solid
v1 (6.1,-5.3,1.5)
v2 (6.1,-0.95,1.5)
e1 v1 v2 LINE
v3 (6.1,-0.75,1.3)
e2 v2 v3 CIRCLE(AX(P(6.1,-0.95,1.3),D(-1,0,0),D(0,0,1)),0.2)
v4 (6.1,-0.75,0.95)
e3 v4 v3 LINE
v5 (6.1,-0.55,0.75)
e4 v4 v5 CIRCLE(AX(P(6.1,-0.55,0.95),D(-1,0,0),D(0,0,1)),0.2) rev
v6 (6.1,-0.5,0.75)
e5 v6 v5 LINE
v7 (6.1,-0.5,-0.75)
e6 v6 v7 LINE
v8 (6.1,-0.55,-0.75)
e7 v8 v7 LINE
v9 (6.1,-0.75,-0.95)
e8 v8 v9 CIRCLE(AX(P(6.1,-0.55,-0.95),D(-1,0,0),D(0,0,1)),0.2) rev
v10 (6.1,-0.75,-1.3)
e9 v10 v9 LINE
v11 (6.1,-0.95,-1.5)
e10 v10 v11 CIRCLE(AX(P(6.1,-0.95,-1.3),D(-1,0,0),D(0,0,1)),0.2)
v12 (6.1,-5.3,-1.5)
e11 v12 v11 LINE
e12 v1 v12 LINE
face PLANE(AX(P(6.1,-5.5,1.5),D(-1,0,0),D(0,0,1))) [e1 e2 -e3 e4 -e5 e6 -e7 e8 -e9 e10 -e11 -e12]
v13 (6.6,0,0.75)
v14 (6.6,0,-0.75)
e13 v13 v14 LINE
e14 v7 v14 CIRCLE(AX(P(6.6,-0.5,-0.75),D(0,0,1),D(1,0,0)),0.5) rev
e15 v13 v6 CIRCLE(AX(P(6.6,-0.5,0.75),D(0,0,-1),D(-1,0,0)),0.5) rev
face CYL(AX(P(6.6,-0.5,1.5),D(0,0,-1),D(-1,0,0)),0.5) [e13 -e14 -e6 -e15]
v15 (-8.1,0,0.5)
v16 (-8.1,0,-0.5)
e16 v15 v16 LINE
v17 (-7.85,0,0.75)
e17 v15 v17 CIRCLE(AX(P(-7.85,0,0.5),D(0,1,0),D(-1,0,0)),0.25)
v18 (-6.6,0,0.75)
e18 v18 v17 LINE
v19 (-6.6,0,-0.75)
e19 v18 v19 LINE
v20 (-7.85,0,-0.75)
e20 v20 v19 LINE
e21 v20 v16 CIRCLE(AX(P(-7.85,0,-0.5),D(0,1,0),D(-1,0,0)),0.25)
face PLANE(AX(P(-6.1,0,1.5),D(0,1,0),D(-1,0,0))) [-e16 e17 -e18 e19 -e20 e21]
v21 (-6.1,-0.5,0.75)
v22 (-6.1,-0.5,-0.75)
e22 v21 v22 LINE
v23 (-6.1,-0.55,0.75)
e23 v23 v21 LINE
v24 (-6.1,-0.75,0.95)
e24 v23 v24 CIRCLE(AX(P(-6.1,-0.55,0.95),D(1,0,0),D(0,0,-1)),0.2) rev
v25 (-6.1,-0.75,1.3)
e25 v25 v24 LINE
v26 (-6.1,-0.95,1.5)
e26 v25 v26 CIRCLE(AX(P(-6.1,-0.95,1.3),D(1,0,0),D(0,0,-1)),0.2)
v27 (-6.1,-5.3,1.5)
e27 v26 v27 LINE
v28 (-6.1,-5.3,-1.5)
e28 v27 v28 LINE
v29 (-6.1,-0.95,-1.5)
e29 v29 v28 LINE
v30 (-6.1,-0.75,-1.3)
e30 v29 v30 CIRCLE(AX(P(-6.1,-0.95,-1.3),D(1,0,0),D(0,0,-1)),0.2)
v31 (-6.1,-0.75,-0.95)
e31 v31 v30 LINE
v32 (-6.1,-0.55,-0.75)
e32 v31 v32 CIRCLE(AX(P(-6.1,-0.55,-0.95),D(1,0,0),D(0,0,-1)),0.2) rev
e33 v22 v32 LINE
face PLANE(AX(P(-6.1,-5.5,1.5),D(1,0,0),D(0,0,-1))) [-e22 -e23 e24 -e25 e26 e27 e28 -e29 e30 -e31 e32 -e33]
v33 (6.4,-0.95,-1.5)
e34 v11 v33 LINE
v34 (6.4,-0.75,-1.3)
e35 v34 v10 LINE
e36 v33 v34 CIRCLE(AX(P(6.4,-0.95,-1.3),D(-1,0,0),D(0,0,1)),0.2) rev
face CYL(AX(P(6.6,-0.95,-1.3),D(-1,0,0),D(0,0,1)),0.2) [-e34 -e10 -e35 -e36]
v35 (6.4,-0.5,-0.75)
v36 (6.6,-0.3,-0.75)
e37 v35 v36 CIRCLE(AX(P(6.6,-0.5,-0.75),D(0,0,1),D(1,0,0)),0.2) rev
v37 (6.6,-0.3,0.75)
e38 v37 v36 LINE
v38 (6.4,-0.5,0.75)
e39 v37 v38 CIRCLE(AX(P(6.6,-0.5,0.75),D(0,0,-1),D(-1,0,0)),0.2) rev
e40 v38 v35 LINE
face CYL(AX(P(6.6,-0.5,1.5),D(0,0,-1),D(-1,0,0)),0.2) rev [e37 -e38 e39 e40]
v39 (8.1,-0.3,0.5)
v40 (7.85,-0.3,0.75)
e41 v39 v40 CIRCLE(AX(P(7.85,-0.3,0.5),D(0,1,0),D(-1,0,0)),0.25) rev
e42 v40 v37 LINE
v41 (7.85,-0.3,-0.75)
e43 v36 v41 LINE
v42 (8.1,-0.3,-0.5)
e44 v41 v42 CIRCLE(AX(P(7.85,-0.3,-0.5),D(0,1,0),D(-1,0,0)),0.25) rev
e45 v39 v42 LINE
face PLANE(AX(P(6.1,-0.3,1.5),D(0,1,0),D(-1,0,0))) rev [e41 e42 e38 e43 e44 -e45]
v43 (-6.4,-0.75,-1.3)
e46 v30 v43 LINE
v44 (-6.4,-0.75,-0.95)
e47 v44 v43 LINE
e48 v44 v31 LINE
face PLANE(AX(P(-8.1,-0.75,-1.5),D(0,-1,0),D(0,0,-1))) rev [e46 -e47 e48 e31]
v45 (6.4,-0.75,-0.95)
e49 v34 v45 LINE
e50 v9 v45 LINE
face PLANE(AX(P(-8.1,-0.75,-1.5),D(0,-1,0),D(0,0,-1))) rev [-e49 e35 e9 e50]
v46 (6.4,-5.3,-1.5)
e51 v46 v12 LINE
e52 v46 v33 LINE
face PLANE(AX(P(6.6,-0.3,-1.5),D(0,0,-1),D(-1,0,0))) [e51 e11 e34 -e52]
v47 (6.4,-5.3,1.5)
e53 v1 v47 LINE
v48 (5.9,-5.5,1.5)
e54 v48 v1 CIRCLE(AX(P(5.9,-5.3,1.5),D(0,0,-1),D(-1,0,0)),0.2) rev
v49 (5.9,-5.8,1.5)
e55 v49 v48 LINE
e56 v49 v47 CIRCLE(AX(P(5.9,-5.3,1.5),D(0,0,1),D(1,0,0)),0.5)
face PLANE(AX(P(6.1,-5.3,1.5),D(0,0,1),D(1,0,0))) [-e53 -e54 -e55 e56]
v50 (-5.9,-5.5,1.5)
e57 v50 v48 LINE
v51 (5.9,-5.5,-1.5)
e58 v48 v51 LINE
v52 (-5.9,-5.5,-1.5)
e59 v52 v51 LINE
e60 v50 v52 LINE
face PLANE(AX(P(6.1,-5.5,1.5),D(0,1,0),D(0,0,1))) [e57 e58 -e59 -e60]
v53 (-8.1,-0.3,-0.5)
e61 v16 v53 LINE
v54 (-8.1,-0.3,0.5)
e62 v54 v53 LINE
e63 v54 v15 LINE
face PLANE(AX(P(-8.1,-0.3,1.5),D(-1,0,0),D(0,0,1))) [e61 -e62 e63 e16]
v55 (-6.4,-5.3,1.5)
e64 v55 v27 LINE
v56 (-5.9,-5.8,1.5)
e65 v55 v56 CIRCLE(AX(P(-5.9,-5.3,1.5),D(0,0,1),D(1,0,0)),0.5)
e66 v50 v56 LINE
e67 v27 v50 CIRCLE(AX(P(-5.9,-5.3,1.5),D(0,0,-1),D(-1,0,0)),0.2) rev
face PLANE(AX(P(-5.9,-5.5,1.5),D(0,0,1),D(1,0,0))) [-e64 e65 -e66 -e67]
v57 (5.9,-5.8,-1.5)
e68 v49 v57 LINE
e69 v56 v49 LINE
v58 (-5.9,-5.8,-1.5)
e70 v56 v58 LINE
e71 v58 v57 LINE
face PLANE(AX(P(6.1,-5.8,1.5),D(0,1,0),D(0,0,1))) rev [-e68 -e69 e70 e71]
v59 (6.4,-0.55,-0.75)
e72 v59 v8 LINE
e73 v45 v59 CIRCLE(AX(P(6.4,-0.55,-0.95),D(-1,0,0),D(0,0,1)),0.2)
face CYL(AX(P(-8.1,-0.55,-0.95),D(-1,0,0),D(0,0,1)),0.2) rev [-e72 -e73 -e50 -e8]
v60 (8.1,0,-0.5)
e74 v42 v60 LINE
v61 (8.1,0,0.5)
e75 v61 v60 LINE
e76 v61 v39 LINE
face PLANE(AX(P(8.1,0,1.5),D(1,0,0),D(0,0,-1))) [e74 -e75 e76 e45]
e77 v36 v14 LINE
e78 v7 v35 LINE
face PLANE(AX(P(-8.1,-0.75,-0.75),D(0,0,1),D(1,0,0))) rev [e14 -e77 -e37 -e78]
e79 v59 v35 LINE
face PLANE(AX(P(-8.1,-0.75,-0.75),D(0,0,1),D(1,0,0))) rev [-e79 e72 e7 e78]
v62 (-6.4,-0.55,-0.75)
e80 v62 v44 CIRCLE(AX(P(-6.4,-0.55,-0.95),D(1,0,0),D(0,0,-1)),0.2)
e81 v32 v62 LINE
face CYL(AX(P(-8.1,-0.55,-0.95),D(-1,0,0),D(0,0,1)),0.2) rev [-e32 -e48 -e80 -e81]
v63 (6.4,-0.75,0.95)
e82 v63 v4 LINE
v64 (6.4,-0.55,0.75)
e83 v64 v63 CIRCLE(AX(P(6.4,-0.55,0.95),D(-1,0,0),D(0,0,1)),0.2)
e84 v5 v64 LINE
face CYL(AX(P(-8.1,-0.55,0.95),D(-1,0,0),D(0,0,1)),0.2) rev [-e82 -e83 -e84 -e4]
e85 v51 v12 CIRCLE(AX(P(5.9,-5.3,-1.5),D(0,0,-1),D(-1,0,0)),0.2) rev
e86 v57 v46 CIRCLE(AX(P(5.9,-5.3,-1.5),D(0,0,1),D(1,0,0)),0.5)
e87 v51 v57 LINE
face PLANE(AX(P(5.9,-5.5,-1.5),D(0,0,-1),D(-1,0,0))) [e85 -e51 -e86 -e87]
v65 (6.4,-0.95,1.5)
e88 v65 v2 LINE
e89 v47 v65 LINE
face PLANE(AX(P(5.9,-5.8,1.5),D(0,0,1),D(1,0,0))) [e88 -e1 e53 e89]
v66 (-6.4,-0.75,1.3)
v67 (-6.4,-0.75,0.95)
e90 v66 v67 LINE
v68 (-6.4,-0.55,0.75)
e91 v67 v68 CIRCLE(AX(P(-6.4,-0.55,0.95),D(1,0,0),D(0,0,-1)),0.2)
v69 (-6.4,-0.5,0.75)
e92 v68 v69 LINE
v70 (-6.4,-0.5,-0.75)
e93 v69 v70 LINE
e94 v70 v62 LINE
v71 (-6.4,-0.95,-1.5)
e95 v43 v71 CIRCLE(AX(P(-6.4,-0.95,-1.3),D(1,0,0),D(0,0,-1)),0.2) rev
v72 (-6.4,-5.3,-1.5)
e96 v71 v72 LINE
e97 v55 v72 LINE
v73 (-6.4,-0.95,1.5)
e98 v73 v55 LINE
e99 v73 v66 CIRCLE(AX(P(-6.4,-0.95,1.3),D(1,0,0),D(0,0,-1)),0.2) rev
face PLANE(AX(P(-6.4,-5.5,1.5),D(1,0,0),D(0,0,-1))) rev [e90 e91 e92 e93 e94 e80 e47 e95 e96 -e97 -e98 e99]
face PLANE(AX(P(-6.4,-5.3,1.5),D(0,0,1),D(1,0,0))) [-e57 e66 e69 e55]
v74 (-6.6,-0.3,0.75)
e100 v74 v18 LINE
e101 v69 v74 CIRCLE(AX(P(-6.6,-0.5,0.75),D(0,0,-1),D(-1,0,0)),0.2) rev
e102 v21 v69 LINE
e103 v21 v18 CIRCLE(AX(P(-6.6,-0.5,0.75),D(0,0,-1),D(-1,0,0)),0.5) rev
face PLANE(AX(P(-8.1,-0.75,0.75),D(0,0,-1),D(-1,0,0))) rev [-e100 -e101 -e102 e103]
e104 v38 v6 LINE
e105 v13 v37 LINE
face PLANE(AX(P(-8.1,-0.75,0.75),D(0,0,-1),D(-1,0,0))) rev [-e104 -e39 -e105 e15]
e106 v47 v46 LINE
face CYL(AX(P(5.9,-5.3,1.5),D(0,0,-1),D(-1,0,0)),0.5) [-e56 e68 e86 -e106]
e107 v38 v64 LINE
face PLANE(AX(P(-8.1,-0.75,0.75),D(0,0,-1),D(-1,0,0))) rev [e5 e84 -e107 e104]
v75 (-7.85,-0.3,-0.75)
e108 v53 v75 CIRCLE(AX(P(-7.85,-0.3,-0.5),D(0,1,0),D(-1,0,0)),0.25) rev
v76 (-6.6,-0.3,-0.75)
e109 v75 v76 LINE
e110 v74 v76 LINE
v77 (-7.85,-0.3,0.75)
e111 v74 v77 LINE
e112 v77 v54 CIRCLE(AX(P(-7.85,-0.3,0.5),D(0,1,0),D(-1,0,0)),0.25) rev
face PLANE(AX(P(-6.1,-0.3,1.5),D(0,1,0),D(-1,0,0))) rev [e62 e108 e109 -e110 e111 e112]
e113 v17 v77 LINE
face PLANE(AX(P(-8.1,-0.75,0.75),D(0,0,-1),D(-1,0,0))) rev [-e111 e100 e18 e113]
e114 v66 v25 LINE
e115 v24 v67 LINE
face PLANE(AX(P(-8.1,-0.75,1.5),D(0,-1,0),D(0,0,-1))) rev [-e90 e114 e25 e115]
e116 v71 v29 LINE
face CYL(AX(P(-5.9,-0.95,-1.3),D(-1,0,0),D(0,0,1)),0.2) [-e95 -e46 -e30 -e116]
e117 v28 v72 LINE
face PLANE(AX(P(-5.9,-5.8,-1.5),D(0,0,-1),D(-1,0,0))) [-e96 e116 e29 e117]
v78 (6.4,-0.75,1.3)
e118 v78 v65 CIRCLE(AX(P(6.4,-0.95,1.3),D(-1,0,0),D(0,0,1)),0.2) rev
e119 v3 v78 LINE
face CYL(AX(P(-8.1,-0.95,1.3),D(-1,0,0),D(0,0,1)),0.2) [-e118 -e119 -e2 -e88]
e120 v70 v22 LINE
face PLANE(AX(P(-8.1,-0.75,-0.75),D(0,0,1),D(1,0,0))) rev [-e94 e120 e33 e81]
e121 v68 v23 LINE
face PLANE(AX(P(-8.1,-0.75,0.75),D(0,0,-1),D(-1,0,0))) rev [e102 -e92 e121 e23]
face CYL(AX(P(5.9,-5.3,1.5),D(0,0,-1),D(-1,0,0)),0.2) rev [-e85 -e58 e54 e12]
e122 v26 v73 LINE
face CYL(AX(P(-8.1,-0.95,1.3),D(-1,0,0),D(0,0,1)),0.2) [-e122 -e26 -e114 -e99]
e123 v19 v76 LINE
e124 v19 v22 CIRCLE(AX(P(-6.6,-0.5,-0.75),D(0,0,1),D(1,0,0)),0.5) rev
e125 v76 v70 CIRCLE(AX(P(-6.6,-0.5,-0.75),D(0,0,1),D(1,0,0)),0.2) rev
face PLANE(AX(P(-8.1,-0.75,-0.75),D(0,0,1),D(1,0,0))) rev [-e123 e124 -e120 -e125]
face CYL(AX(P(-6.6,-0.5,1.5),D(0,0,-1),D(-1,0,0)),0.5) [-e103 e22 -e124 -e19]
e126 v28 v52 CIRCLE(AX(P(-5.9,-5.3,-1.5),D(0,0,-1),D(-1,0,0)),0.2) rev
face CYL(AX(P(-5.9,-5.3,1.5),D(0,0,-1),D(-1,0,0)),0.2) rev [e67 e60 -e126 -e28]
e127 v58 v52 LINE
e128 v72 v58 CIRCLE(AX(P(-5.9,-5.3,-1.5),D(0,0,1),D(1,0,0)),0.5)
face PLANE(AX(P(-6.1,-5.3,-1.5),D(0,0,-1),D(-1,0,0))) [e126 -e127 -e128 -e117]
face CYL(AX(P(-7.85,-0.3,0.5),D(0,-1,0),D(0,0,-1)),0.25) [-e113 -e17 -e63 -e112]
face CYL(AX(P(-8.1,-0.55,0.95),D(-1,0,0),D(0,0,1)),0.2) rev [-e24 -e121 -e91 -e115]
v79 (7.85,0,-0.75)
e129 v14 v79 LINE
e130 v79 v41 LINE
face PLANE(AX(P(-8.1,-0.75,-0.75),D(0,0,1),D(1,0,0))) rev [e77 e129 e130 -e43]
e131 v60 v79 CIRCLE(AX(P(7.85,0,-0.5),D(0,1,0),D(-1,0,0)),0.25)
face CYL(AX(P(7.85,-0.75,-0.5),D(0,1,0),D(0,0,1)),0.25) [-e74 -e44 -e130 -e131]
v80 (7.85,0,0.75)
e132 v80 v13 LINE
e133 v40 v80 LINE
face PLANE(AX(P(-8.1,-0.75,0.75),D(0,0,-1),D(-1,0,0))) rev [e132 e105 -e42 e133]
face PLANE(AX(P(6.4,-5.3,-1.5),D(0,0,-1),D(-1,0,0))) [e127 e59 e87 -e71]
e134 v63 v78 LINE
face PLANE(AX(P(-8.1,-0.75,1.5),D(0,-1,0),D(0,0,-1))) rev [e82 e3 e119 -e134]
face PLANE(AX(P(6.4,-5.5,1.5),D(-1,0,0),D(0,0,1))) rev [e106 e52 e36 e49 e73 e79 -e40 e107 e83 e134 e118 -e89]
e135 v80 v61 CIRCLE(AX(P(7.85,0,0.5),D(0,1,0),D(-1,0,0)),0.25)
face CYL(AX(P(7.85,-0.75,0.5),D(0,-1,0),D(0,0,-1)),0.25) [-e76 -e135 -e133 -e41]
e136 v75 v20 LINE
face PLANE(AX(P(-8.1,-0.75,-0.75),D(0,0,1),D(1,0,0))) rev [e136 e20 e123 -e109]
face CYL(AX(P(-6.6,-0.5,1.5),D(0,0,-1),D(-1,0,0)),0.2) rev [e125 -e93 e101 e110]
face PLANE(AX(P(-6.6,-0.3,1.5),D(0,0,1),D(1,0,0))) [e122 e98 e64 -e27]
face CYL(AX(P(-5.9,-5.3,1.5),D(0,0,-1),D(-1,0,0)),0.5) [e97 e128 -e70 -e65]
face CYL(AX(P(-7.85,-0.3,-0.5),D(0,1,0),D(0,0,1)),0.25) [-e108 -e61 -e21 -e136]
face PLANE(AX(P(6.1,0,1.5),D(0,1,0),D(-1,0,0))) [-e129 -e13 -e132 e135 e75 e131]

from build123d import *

# Parameters (mm, degrees)
BASE_FLANGE1_DEPTH      = 1.5
CUT_EXTRUDE1_DEPTH      = 11.07472084
CUT_EXTRUDE1_DEPTH_BACK = 11.07472084
SKETCH6_W               = 0.75
SKETCH6_H               = 3.25
FILLET1_R               = 0.2
FILLET2_R               = 0.25


# Sheet-metal steps are written as plain solids
with BuildPart() as part:
    # Sketch1 → Base-Flange1 (new, symmetric)
    with BuildSketch(Plane.XY):
        with BuildLine():
            Line((8.1, 0), (6.6, 0))
            ThreePointArc((6.6, 0), (6.246446609, -0.146446609), (6.1, -0.5))
            Line((6.1, -0.5), (6.1, -5.3))
            ThreePointArc((6.1, -5.3), (6.041421356, -5.441421356), (5.9, -5.5))
            Line((5.9, -5.5), (-5.9, -5.5))
            ThreePointArc((-5.9, -5.5), (-6.041421356, -5.441421356), (-6.1, -5.3))
            Line((-6.1, -5.3), (-6.1, -0.5))
            ThreePointArc((-6.1, -0.5), (-6.246446609, -0.146446609), (-6.6, 0))
            Line((-6.6, 0), (-8.1, 0))
            Line((-8.1, 0), (-8.1, -0.3))
            Line((-8.1, -0.3), (-6.6, -0.3))
            ThreePointArc((-6.6, -0.3), (-6.458578644, -0.358578644), (-6.4, -0.5))
            Line((-6.4, -0.5), (-6.4, -5.3))
            ThreePointArc((-6.4, -5.3), (-6.253553391, -5.653553391), (-5.9, -5.8))
            Line((-5.9, -5.8), (5.9, -5.8))
            ThreePointArc((5.9, -5.8), (6.253553391, -5.653553391), (6.4, -5.3))
            Line((6.4, -5.3), (6.4, -0.5))
            ThreePointArc((6.4, -0.5), (6.458578644, -0.358578644), (6.6, -0.3))
            Line((6.6, -0.3), (8.1, -0.3))
            Line((8.1, -0.3), (8.1, 0))
        make_face()
    extrude(amount=BASE_FLANGE1_DEPTH, both=True)

    # Sketch6 → Cut-Extrude1 (cut, two sides: drawn at the far end of the back side and taken through both)
    with BuildSketch(Plane(origin=(0, 0, 0), x_dir=(0, 0, -1), z_dir=(1, 0, 0)).offset(-CUT_EXTRUDE1_DEPTH_BACK)):
        with Locations((1.125, 0.875)):
            Rectangle(SKETCH6_W, SKETCH6_H)
        with Locations((-1.125, 0.875)):
            Rectangle(SKETCH6_W, SKETCH6_H)
    extrude(amount=CUT_EXTRUDE1_DEPTH + CUT_EXTRUDE1_DEPTH_BACK, mode=Mode.SUBTRACT)

    # Fillet1
    fillet1_edges = [part.edges().sort_by_distance(p)[0] for p in [
        (6.25, -0.75, -1.5),
        (-6.25, -0.75, -1.5),
        (6.25, -0.75, -0.75),
        (-6.25, -0.75, -0.75),
        (6.25, -0.75, 1.5),
        (-6.25, -0.75, 1.5),
        (6.25, -0.75, 0.75),
        (-6.25, -0.75, 0.75),
    ]]
    fillet(fillet1_edges, radius=FILLET1_R)

    # Fillet2
    fillet2_edges = [part.edges().sort_by_distance(p)[0] for p in [
        (-8.1, -0.15, -0.75),
        (8.1, -0.15, -0.75),
        (8.1, -0.15, 0.75),
        (-8.1, -0.15, 0.75),
    ]]
    fillet(fillet2_edges, radius=FILLET2_R)


solid = part.part
